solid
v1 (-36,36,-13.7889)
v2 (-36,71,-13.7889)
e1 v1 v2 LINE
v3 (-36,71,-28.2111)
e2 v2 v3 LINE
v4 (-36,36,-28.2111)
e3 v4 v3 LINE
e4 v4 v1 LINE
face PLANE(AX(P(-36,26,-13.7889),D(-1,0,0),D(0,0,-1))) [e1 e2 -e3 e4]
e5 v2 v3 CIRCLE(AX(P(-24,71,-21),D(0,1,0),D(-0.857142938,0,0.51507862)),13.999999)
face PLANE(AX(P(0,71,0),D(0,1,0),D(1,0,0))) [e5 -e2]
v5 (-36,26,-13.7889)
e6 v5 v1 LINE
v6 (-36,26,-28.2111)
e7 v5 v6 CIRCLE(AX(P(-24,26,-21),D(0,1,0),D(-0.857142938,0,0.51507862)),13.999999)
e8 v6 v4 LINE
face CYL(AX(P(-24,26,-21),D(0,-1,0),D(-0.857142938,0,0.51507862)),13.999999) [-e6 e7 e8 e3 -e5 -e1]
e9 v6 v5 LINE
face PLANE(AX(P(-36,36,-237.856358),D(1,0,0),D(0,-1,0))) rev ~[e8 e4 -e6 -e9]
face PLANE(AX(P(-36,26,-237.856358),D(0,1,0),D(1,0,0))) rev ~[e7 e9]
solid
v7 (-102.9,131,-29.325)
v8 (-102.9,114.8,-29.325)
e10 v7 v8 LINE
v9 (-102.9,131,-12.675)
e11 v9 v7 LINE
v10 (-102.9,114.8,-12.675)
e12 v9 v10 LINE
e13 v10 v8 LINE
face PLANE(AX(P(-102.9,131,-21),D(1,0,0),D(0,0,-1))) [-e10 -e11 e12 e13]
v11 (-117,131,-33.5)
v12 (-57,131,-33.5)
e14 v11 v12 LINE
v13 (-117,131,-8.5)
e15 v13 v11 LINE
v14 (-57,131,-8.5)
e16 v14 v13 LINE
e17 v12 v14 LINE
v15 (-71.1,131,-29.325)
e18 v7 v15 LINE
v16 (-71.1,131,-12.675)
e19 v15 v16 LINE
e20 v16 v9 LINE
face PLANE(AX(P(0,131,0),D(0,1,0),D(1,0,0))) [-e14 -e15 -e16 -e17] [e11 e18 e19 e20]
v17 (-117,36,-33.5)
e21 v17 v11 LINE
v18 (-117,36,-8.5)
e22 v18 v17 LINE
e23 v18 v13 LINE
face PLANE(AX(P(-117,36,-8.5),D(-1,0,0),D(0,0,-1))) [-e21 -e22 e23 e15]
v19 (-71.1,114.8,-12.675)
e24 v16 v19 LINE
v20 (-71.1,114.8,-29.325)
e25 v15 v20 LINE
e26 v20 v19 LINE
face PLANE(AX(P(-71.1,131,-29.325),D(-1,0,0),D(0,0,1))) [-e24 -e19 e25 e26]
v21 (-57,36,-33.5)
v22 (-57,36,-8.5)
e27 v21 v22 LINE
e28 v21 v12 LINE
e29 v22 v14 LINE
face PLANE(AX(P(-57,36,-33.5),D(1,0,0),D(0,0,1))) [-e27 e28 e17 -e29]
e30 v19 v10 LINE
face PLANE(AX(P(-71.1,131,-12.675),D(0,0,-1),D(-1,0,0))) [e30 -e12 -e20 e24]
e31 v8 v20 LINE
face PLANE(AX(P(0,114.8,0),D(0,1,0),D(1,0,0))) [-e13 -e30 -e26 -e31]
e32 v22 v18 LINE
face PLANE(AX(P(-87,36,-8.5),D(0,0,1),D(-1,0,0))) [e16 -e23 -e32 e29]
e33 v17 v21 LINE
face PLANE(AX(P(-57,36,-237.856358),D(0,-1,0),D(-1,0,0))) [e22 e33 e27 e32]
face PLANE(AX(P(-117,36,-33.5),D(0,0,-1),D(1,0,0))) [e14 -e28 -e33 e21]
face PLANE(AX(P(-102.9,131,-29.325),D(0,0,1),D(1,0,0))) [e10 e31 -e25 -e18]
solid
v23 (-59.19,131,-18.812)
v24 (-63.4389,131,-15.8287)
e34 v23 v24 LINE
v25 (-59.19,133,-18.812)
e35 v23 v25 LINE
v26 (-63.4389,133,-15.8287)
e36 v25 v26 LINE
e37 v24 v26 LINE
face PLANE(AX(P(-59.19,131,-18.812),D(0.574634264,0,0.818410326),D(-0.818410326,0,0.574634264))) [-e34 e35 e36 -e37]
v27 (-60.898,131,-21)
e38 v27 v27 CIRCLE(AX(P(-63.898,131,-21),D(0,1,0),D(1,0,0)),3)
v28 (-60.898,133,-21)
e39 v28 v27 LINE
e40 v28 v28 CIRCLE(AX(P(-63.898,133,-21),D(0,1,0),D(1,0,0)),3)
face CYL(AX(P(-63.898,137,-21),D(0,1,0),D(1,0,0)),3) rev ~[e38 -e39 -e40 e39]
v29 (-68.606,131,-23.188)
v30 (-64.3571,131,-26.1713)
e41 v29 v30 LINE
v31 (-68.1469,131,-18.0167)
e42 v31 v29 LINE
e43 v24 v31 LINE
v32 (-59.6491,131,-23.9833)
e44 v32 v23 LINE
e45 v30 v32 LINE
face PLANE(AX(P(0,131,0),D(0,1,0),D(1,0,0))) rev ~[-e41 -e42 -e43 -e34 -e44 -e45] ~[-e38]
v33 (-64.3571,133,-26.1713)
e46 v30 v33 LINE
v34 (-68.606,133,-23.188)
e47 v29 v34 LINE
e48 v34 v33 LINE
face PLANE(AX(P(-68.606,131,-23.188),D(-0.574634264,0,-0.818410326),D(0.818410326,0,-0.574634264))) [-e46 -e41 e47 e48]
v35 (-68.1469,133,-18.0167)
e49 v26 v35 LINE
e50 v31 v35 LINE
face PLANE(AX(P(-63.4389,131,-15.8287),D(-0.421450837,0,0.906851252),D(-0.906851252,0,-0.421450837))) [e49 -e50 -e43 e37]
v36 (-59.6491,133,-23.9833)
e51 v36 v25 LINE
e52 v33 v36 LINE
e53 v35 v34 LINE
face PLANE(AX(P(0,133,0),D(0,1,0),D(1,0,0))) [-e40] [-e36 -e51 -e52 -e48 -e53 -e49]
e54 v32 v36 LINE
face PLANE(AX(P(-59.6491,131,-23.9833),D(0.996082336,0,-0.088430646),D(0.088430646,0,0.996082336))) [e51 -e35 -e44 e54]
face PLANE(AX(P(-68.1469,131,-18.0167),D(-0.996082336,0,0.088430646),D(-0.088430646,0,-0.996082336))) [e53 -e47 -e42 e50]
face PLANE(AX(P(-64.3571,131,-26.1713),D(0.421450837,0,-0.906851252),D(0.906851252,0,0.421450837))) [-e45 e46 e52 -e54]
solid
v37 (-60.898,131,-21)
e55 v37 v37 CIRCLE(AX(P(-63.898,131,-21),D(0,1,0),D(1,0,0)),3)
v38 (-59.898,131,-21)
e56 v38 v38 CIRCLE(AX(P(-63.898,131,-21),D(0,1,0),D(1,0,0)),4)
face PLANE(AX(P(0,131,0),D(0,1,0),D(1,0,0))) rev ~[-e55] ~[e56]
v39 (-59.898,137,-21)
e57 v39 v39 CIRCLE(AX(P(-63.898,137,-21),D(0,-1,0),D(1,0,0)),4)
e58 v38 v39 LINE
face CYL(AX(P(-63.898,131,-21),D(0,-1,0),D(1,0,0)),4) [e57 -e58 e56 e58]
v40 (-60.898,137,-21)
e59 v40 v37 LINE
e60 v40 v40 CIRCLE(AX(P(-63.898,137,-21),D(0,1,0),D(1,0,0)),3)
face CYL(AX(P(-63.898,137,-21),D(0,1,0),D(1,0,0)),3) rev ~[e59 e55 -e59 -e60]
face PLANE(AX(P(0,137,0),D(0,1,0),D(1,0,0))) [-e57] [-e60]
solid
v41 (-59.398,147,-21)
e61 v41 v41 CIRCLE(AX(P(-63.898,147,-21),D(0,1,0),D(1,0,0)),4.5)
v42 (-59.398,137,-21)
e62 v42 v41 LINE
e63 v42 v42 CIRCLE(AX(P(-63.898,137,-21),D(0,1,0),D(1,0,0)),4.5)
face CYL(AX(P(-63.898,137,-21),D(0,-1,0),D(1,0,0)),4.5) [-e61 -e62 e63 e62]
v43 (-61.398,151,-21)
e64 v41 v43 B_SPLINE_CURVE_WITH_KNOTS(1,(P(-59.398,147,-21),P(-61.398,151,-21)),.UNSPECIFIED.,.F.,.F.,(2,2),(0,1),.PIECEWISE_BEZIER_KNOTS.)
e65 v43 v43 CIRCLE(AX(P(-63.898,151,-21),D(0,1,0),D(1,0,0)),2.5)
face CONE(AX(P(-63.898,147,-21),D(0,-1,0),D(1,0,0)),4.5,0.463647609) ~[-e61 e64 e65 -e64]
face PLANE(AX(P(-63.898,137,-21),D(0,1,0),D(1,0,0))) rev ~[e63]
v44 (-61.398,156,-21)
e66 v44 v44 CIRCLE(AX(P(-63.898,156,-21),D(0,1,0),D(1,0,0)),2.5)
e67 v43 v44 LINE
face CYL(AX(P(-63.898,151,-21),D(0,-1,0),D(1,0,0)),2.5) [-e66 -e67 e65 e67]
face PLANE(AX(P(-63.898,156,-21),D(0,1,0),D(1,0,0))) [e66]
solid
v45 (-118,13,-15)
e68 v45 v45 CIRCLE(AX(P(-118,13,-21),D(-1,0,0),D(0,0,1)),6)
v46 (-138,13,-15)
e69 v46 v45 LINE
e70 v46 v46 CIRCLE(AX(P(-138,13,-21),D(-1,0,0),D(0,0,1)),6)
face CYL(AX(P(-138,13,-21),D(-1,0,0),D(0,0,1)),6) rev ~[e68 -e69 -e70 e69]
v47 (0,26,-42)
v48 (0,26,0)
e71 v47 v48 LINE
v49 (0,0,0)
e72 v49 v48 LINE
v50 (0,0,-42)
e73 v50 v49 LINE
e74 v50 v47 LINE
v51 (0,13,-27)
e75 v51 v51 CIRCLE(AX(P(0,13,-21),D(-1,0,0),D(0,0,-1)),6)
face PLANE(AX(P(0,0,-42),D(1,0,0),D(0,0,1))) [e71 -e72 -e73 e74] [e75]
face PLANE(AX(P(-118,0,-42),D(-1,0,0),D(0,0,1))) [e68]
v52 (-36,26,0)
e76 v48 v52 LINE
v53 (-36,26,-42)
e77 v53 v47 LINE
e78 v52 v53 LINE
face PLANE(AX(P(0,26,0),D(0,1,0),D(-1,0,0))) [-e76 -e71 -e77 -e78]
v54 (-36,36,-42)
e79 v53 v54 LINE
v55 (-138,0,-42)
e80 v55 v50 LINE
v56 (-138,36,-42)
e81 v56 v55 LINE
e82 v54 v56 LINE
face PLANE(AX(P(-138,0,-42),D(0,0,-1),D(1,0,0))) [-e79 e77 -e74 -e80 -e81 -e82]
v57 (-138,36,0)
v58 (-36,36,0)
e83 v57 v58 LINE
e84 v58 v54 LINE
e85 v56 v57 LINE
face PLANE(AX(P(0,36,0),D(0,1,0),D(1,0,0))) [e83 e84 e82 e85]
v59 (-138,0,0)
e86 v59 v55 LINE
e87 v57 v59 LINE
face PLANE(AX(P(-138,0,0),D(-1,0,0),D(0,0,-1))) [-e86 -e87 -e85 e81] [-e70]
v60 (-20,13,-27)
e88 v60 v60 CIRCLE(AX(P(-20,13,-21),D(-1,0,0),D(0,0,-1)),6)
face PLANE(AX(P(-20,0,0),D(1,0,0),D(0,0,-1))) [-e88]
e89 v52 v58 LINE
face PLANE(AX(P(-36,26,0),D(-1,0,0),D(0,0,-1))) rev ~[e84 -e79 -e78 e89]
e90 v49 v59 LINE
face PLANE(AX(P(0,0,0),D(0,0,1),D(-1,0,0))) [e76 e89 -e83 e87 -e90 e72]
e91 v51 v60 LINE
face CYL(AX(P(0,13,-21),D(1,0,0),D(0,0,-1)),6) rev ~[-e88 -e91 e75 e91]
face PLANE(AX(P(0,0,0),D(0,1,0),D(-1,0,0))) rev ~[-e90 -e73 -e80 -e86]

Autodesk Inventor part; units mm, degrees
ref_plane "YZ Plane" through (0, 0, 0) normal (1, 0, 0) x (0, 1, 0)
ref_plane "XZ Plane" through (0, 0, 0) normal (0, 1, 0) x (-1, 0, 0)
sketch "Sketch1" plane through (0, 0, 0) normal (0, 1, 0) x (-1, 0, 0)
  line L0 (0, 0) -> (138, 0)
  line L1 (138, 0) -> (138, -42)
  line L2 (138, -42) -> (0, -42)
  line L3 (0, -42) -> (0, 0)
  dimension "d0" = 138
  dimension "d1" = 42
extrude "Extrusion1" add sketch "Sketch1" along normal blind 26
sketch "Sketch2" plane through (0, 26, 0) normal (0, 1, 0) x (1, 0, 0)
  line L0 (-138, 42) -> (-138, 0) projected
  line L1 (0, 42) -> (-138, 42) projected
  line L2 (-138, 0) -> (-36, 0)
  line L3 (-36, 0) -> (-36, 42)
  line L4 (-36, 42) -> (-138, 42)
  line L5 (-138, 42) -> (-138, 0)
  point P0 (0, 0)
  dimension "d4" = 102
extrude "Extrusion2" add sketch "Sketch2" along normal blind 10
sketch "Sketch3" plane through (0, 26, 0) normal (0, 1, 0) x (1, 0, 0)
  line L0 (-36, 0) -> (-36, 42) projected
  line L1 (-36, 21) -> (-24, 21)
  arc A0 (-36, 13.7889) -> (-36, 28.2111) centre (-24, 21) ccw
  line L2 (-36, 13.7889) -> (-36, 28.2111)
  point P0 (0, 0)
  dimension "d7" = 12
  dimension "d8" = 14
extrude "Extrusion3" add sketch "Sketch3" along normal blind 45
sketch "Sketch4" plane through (0, 36, 0) normal (0, 1, 0) x (1, 0, 0)
  line L0 (-138, 42) -> (-138, 0) projected
  line L1 (-138, 0) -> (-87, 0)
  line L2 (-138, 0) -> (-36, 0) projected
  line L3 (-87, 0) -> (-87, 21)
  line L4 (-36, 42) -> (-138, 42) projected
  line L5 (-57, 8.5) -> (-117, 8.5)
  line L6 (-117, 8.5) -> (-117, 33.5)
  line L7 (-117, 33.5) -> (-57, 33.5)
  line L8 (-57, 33.5) -> (-57, 8.5)
  line L9 (-57, 8.5) -> (-117, 33.5) construction
  line L10 (-117, 8.5) -> (-57, 33.5) construction
  point P0 (0, 0)
  dimension "d11" = 21
  dimension "d12" = 60
  dimension "d13" = 25
extrude "Extrusion4" add sketch "Sketch4" along normal blind 95
sketch "Sketch6" plane through (-138, 0, 0) normal (0, 0, 1) x (1, 0, 0)
  line L0 (138, 26) -> (102, 26) projected
  line L1 (102, 26) -> (138, 26)
  line L2 (138, 26) -> (138, 79.7239)
  line L3 (138, 79.7239) -> (98.9473, 78.614)
  line L4 (102, 26) -> (102, 36) projected
  line L5 (98.9473, 78.614) -> (102, 36)
  line L6 (102, 36) -> (102, 26)
  point P0 (138, 0)
split body "Split1" sketch "Sketch6" result two bodies curves L2 L3 L5 L6 L1 first body at (-23.4126, 56, -34.4872)
sketch "Sketch7" plane through (-138, 0, 0) normal (0, 0, 1) x (1, 0, 0)
  line L0 (81, 36) -> (21, 36) projected
  line L1 (81, 36) -> (81, 131) projected
  line L2 (21, 131) -> (81, 131) projected
  line L3 (21, 36) -> (21, 131) projected
  point P0 (138, 0)
split body "Split2" sketch "Sketch7" result two bodies bodies 3 curves L1 L2 L3 L0 first body at (-97, 67.6667, -9)
sketch "Sketch8" plane through (0, 0, 0) normal (1, 0, 0) x (0, 0, -1)
  line L0 (0, 0) -> (42, 0) projected
  line L1 (21, 0) -> (21, 13)
  circle A0 centre (21, 13) radius 6
  dimension "d16" = 13
  dimension "d17" = 12
extrude "Extrusion5" cut sketch "Sketch8" against normal blind 20 bodies 5
sketch "Sketch9" plane through (-138, 0, -42) normal (-1, 0, 0) x (0, 0, 1)
  circle A0 centre (21, 13) radius 6 projected
  point P0 (42, 0)
extrude "Extrusion6" cut sketch "Sketch9" against normal blind 20 bodies 5
thread "Thread1" size "M12x1.75" class "6H" standard "ANSI Metric M Profile" full length
sketch "Sketch12" plane through (-57, 131, -33.5) normal (0, 0, -1) x (-1, 0, 0)
  line L0 (0.306, -7.7857) -> (59.5727, -7.7857) construction
  line L1 (59.5727, -7.7857) -> (59.5727, -94.7807) construction
  line L2 (59.5727, -94.7807) -> (0.306, -94.7807) construction
  line L3 (0.306, -94.7807) -> (0.306, -7.7857) construction
  point P0 (-57, -131)
decal "Decal2"
sketch "Sketch13" plane through (0, 131, 0) normal (0, 1, 0) x (1, 0, 0)
  line L0 (-117, 33.5) -> (-117, 8.5) projected
  line L1 (-117, 21) -> (-87, 21)
  line L2 (-102.9, 29.325) -> (-71.1, 29.325)
  line L3 (-71.1, 29.325) -> (-71.1, 12.675)
  line L4 (-71.1, 12.675) -> (-102.9, 12.675)
  line L5 (-102.9, 12.675) -> (-102.9, 29.325)
  line L6 (-102.9, 29.325) -> (-71.1, 12.675) construction
  line L7 (-71.1, 29.325) -> (-102.9, 12.675) construction
  point P0 (0, 0)
  dimension "d38" = 30
  dimension "d39" = 31.8
  dimension "d40" = 16.65
extrude "Extrusion7" cut sketch "Sketch13" against normal blind 16.2 bodies 4
sketch "Sketch14" plane through (0, 131, 0) normal (0, 1, 0) x (1, 0, 0)
  line L0 (-71.1, 29.325) -> (-71.1, 12.675) projected
  line L1 (-71.1, 21) -> (-63.898, 21)
  circle A0 centre (-63.898, 21) radius 4
  point P0 (0, 0)
  dimension "d52" = 7.202
  dimension "d53" = 8
extrude "Extrusion8" add sketch "Sketch14" along normal blind 6 separate body
thread "Thread2" size "M8x1.25" class "6g" standard "ANSI Metric M Profile" full length
sketch "Sketch16" plane through (0, 131, 0) normal (0, 1, 0) x (1, 0, 0)
  circle A0 centre (-63.898, 21) radius 3 projected
  circle A1 centre (-63.898, 21) radius 4 projected
  line L0 (-63.4389, 15.8287) -> (-68.1469, 18.0167)
  line L1 (-68.1469, 18.0167) -> (-68.606, 23.188)
  line L2 (-68.606, 23.188) -> (-64.3571, 26.1713)
  line L3 (-64.3571, 26.1713) -> (-59.6491, 23.9833)
  line L4 (-59.6491, 23.9833) -> (-59.19, 18.812)
  line L5 (-59.19, 18.812) -> (-63.4389, 15.8287)
  point P0 (0, 0)
extrude "Extrusion10" add sketch "Sketch16" along normal blind 2 separate body contours A0 | A1 | L0 L1 L2 L3 L4 L5
sketch "Sketch17" plane through (-63.898, 137, -21) normal (0, 1, 0) x (1, 0, 0)
  circle A0 centre (0, 0) radius 3
  point P0 (63.898, -21)
  dimension "d63" = 6
extrude "Extrusion11" cut sketch "Sketch17" against normal blind 6 bodies 6 7
sketch "Sketch18" plane through (-63.898, 137, -21) normal (0, 1, 0) x (1, 0, 0)
  circle A0 centre (0, 0) radius 4.5
  point P0 (63.898, -21)
  dimension "d66" = 9
extrude "Extrusion12" add sketch "Sketch18" along normal blind 10 separate body
ref_plane "Work Plane1" through (-63.898, 151, -21) normal (0, 1, 0) x (1, 0, 0)
sketch "Sketch19" plane through (-63.898, 151, -21) normal (0, 1, 0) x (1, 0, 0)
  circle A0 centre (0, 0) radius 2.5
  point P0 (63.898, -21)
  dimension "d70" = 5
extrude "Extrusion13" add sketch "Sketch19" along normal blind 5 separate body
loft "Loft1" add bodies 8 section 1 edges at (-68.398, 147, -21) section 2 edges at (-66.398, 151, -21)
combine bodies "Combine1" operation type add bodies to combine 9 8
sketch "Sketch20" plane through (-63.898, 156, -21) normal (0, 1, 0) x (1, 0, 0)
  circle A0 centre (0, 0) radius 2.5 projected
properties part number "alicat_flujo"
